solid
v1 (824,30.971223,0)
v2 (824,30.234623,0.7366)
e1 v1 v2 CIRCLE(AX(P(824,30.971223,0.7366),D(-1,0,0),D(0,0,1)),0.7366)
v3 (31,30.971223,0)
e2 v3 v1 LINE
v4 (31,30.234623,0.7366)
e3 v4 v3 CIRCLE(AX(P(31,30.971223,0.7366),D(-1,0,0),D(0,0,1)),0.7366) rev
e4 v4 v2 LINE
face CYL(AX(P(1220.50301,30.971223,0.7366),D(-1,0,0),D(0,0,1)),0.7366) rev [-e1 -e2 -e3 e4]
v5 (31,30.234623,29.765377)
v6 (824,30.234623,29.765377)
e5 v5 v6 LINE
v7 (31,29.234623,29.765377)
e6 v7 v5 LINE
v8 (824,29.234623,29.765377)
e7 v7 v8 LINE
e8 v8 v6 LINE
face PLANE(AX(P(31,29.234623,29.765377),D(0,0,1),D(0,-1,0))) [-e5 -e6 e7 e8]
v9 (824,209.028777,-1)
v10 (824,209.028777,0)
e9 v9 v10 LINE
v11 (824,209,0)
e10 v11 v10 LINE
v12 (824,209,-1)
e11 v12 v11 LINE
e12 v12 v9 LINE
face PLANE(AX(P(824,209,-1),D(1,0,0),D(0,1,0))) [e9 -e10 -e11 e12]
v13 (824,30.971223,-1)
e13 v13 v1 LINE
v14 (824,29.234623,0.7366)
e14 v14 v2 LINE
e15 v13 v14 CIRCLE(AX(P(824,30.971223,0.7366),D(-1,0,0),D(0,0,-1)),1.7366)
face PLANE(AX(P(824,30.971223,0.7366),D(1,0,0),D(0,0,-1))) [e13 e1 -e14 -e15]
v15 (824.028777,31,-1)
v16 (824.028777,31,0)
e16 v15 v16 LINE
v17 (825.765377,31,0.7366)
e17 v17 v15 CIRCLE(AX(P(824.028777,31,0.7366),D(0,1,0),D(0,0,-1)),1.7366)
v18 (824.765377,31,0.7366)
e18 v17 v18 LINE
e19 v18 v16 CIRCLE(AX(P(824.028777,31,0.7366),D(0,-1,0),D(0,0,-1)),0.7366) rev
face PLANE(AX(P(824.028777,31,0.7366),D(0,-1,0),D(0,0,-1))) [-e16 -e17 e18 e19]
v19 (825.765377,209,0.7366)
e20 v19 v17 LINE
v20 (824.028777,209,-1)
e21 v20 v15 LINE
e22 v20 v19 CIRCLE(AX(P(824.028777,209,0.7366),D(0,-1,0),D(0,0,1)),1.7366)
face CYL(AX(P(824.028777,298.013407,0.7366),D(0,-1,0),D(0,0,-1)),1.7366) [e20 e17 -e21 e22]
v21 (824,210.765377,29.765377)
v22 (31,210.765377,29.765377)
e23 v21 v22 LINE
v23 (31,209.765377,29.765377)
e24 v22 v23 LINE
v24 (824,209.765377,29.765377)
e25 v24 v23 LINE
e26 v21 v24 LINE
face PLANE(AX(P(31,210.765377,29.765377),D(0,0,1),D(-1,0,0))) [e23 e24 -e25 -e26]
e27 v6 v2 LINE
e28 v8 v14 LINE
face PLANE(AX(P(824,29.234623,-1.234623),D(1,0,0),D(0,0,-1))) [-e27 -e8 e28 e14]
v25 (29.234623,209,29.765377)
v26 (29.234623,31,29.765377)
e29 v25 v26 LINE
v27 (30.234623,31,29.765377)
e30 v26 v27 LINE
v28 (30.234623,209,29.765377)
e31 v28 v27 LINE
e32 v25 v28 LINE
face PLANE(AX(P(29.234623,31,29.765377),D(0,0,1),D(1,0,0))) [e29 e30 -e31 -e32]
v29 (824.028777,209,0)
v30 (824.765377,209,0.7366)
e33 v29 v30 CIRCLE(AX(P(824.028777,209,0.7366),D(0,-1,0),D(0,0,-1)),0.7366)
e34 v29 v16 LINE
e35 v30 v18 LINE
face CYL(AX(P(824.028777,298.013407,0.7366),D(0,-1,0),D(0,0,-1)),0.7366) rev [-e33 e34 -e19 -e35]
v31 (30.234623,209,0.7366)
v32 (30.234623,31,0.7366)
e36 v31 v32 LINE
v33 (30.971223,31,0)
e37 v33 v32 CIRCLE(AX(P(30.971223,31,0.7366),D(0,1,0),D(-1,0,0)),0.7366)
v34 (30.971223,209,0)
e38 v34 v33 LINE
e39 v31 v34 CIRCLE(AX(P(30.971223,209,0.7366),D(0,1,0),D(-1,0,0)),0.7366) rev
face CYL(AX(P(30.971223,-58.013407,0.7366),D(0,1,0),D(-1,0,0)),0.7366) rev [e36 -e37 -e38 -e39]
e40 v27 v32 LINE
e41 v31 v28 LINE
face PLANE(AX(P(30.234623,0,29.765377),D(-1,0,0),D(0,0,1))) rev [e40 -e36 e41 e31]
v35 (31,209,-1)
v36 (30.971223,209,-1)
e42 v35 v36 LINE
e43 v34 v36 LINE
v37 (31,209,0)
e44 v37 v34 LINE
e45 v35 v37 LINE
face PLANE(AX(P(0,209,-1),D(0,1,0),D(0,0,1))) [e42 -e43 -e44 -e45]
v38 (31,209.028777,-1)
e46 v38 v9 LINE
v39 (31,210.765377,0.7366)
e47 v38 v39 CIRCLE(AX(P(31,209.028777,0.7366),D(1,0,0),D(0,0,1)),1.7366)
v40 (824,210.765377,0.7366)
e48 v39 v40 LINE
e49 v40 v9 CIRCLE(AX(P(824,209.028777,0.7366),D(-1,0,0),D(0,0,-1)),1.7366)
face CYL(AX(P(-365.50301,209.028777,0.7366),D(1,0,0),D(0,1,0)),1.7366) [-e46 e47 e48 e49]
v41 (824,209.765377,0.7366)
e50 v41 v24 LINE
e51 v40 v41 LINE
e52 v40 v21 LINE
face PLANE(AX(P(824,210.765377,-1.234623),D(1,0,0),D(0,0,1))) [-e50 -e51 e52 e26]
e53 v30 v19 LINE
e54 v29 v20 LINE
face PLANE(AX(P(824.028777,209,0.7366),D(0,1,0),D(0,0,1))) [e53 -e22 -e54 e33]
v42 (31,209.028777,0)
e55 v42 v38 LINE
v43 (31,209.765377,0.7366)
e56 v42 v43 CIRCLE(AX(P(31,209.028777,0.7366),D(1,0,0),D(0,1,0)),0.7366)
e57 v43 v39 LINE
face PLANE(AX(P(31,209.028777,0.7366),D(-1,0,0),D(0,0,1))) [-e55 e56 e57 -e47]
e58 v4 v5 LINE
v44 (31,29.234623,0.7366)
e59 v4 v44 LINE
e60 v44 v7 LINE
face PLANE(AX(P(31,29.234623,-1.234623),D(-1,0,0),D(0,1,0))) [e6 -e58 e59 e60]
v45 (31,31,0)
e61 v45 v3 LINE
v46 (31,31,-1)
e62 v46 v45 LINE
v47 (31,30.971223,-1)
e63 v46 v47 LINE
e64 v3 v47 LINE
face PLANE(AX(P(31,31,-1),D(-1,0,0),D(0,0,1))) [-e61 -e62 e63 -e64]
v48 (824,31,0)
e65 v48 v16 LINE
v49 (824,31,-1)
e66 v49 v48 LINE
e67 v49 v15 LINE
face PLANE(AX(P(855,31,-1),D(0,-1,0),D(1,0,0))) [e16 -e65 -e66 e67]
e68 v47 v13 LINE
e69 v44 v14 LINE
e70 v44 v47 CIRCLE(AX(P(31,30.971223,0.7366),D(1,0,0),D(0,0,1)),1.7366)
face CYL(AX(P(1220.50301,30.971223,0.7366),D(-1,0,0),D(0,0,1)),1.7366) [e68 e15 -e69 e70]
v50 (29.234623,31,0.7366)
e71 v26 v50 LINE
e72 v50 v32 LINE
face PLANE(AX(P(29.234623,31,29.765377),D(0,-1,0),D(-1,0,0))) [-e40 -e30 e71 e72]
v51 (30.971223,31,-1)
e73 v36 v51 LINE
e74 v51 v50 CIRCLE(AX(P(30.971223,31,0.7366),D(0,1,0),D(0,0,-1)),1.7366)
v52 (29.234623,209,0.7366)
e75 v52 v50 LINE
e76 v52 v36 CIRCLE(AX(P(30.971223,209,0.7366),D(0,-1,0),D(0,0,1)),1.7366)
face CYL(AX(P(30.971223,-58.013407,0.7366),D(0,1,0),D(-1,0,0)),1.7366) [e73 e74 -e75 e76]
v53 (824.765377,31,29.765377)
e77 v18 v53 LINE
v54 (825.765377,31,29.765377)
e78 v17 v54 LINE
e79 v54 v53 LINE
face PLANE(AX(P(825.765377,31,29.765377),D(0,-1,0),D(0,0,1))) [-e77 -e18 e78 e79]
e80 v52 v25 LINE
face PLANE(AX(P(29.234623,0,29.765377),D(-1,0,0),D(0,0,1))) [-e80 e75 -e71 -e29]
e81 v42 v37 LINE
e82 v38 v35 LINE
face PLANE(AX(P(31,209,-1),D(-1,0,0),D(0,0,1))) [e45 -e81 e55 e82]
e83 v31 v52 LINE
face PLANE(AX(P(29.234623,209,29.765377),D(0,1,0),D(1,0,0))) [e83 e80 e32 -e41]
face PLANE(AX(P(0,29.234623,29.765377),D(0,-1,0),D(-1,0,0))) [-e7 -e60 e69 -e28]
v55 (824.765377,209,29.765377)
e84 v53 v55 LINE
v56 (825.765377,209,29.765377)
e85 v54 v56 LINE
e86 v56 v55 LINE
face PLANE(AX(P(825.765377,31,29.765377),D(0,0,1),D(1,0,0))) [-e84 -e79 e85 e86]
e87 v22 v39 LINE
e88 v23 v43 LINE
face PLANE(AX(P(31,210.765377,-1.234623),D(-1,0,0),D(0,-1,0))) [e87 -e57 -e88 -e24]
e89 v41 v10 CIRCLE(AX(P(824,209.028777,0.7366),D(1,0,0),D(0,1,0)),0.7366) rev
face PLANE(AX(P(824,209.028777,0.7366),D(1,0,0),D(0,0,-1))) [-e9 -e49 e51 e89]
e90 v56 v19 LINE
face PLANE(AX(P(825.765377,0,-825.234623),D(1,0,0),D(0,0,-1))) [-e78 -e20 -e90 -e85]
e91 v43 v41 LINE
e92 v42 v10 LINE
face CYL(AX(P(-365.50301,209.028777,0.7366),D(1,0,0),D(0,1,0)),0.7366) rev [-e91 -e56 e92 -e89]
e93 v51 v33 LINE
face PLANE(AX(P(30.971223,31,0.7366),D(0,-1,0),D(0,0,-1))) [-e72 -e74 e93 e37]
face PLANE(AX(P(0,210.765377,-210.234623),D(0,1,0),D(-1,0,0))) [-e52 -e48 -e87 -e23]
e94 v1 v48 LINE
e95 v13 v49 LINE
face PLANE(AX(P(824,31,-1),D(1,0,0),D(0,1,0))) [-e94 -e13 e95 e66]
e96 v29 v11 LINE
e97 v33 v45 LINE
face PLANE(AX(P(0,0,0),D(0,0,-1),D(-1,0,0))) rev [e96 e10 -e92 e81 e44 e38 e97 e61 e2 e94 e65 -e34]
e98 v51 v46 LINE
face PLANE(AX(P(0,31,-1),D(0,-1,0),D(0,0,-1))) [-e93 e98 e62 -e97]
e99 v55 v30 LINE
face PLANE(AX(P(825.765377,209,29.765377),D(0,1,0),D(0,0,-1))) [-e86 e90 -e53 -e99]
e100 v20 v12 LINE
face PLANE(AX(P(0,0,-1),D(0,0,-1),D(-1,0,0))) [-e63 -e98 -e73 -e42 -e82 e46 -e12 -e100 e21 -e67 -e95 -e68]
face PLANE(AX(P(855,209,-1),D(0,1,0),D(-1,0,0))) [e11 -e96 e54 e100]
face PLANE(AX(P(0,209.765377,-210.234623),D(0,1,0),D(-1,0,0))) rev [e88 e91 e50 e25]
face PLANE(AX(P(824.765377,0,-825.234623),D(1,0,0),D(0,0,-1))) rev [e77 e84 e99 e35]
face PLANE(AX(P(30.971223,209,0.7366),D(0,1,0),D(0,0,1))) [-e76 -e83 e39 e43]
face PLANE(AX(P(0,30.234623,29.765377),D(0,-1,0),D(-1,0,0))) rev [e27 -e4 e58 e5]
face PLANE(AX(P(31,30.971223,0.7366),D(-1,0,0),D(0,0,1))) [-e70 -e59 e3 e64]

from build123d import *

# Parameters (mm, degrees)
BASE_FLANGE1_DEPTH         = 1
SKETCHED_START             = 31
SKETCHED_BEND1_DEPTH       = 178
SKETCHED_BEND1_2_DEPTH     = 793
SKETCHED_BEND1_3_OUTLINE_W = 793
SKETCHED_BEND1_3_OUTLINE_H = 1
SKETCHED_BEND1_3_DEPTH     = 29.234623369
SKETCHED_START_2           = 210.765376631
SKETCHED_BEND1_4_OUTLINE_W = 793
SKETCHED_BEND1_4_OUTLINE_H = 1
SKETCHED_BEND1_4_DEPTH     = 29.234623369
SKETCHED_BEND1_5_DEPTH     = 178
SKETCHED_BEND1_6_DEPTH     = 793
SKETCHED_BEND1_7_OUTLINE_W = 178
SKETCHED_BEND1_7_OUTLINE_H = 1
SKETCHED_BEND1_7_DEPTH     = 29.234623369
SKETCHED_START_3           = 825.765376631
SKETCHED_BEND1_8_OUTLINE_W = 178
SKETCHED_BEND1_8_OUTLINE_H = 1
SKETCHED_BEND1_8_DEPTH     = 29.234623369


# Read off the part's stored shape, not the designer's step: Sketched Bend1
# Sheet-metal steps are written as plain solids
with BuildPart() as part:
    # Sketch1 → Base-Flange1 (new body)
    with BuildSketch(Plane.XY):
        Polygon((0, 209), (31, 209), (31, 240), (824, 240), (824, 209), (855, 209), (855, 31), (824, 31), (824, 0), (31, 0), (31, 31), (0, 31), align=None)
    extrude(amount=-BASE_FLANGE1_DEPTH)

    # Sketched Bend1 outline → Sketched Bend1 (add)
    with BuildSketch(Plane(origin=(0, 0, 0), x_dir=(1, 0, 0), z_dir=(0, 1, 0)).offset(SKETCHED_START)):
        with BuildLine():
            Line((29.234623369, -0.7366), (29.234623369, -29.765376631))
            Line((29.234623369, -29.765376631), (30.234623369, -29.765376631))
            Line((30.234623369, -29.765376631), (30.234623369, -0.7366))
            ThreePointArc((30.234623369, -0.7366), (30.450368514, -0.215745145), (30.971223369, 0))
            Line((30.971223369, 0), (29.398582279, 0))
            ThreePointArc((29.398582279, 0), (29.276108612, -0.359286442), (29.234623369, -0.7366))
        make_face()
        with BuildLine():
            Line((825.601417721, 0), (824.028776631, 0))
            ThreePointArc((824.028776631, 0), (824.549631486, -0.215745145), (824.765376631, -0.7366))
            Line((824.765376631, -0.7366), (824.765376631, -29.765376631))
            Line((824.765376631, -29.765376631), (825.765376631, -29.765376631))
            Line((825.765376631, -29.765376631), (825.765376631, -0.7366))
            ThreePointArc((825.765376631, -0.7366), (825.723891388, -0.359286442), (825.601417721, 0))
        make_face()
    extrude(amount=SKETCHED_BEND1_DEPTH)

    # Sketched Bend1 2 outline → Sketched Bend1 2 (add)
    with BuildSketch(Plane.YZ.offset(SKETCHED_START)):
        with BuildLine():
            Line((209.028776631, 0), (210.601417721, 0))
            ThreePointArc((210.601417721, 0), (210.723891388, 0.359286442), (210.765376631, 0.7366))
            Line((210.765376631, 0.7366), (210.765376631, 29.765376631))
            Line((210.765376631, 29.765376631), (209.765376631, 29.765376631))
            Line((209.765376631, 29.765376631), (209.765376631, 0.7366))
            ThreePointArc((209.765376631, 0.7366), (209.549631486, 0.215745145), (209.028776631, 0))
        make_face()
        with BuildLine():
            ThreePointArc((29.234623369, 0.7366), (29.276108612, 0.359286442), (29.398582279, 0))
            Line((29.398582279, 0), (30.971223369, 0))
            ThreePointArc((30.971223369, 0), (30.450368514, 0.215745145), (30.234623369, 0.7366))
            Line((30.234623369, 0.7366), (30.234623369, 29.765376631))
            Line((30.234623369, 29.765376631), (29.234623369, 29.765376631))
            Line((29.234623369, 29.765376631), (29.234623369, 0.7366))
        make_face()
    extrude(amount=SKETCHED_BEND1_2_DEPTH)

    # Sketched Bend1 3 outline → Sketched Bend1 3 (cut)
    with BuildSketch(Plane(origin=(0, 0, 0), x_dir=(1, 0, 0), z_dir=(0, 1, 0))):
        with Locations((427.5, 0.5)):
            Rectangle(SKETCHED_BEND1_3_OUTLINE_W, SKETCHED_BEND1_3_OUTLINE_H)
    extrude(amount=SKETCHED_BEND1_3_DEPTH, mode=Mode.SUBTRACT)

    # Sketched Bend1 4 outline → Sketched Bend1 4 (cut)
    with BuildSketch(Plane(origin=(0, 0, 0), x_dir=(1, 0, 0), z_dir=(0, 1, 0)).offset(SKETCHED_START_2)):
        with Locations((427.5, 0.5)):
            Rectangle(SKETCHED_BEND1_4_OUTLINE_W, SKETCHED_BEND1_4_OUTLINE_H)
    extrude(amount=SKETCHED_BEND1_4_DEPTH, mode=Mode.SUBTRACT)

    # Sketched Bend1 5 outline → Sketched Bend1 5 (cut)
    with BuildSketch(Plane(origin=(0, 0, 0), x_dir=(1, 0, 0), z_dir=(0, 1, 0)).offset(SKETCHED_START)):
        with BuildLine():
            Line((0, 0), (29.398582279, 0))
            ThreePointArc((29.398582279, 0), (30.039397205, 0.728828115), (30.971223369, 1))
            Line((30.971223369, 1), (0, 1))
            Line((0, 1), (0, 0))
        make_face()
        with BuildLine():
            Line((855, 1), (824.028776631, 1))
            ThreePointArc((824.028776631, 1), (824.960602795, 0.728828115), (825.601417721, 0))
            Line((825.601417721, 0), (855, 0))
            Line((855, 0), (855, 1))
        make_face()
    extrude(amount=SKETCHED_BEND1_5_DEPTH, mode=Mode.SUBTRACT)

    # Sketched Bend1 6 outline → Sketched Bend1 6 (cut)
    with BuildSketch(Plane.YZ.offset(SKETCHED_START)):
        with BuildLine():
            ThreePointArc((210.601417721, 0), (209.960602795, -0.728828115), (209.028776631, -1))
            Line((209.028776631, -1), (240, -1))
            Line((240, -1), (240, 0))
            Line((240, 0), (210.601417721, 0))
        make_face()
        with BuildLine():
            Line((0, -1), (30.971223369, -1))
            ThreePointArc((30.971223369, -1), (30.039397205, -0.728828115), (29.398582279, 0))
            Line((29.398582279, 0), (0, 0))
            Line((0, 0), (0, -1))
        make_face()
    extrude(amount=SKETCHED_BEND1_6_DEPTH, mode=Mode.SUBTRACT)

    # Sketched Bend1 7 outline → Sketched Bend1 7 (cut)
    with BuildSketch(Plane.YZ):
        with Locations((120, -0.5)):
            Rectangle(SKETCHED_BEND1_7_OUTLINE_W, SKETCHED_BEND1_7_OUTLINE_H)
    extrude(amount=SKETCHED_BEND1_7_DEPTH, mode=Mode.SUBTRACT)

    # Sketched Bend1 8 outline → Sketched Bend1 8 (cut)
    with BuildSketch(Plane.YZ.offset(SKETCHED_START_3)):
        with Locations((120, -0.5)):
            Rectangle(SKETCHED_BEND1_8_OUTLINE_W, SKETCHED_BEND1_8_OUTLINE_H)
    extrude(amount=SKETCHED_BEND1_8_DEPTH, mode=Mode.SUBTRACT)


solid = part.part
